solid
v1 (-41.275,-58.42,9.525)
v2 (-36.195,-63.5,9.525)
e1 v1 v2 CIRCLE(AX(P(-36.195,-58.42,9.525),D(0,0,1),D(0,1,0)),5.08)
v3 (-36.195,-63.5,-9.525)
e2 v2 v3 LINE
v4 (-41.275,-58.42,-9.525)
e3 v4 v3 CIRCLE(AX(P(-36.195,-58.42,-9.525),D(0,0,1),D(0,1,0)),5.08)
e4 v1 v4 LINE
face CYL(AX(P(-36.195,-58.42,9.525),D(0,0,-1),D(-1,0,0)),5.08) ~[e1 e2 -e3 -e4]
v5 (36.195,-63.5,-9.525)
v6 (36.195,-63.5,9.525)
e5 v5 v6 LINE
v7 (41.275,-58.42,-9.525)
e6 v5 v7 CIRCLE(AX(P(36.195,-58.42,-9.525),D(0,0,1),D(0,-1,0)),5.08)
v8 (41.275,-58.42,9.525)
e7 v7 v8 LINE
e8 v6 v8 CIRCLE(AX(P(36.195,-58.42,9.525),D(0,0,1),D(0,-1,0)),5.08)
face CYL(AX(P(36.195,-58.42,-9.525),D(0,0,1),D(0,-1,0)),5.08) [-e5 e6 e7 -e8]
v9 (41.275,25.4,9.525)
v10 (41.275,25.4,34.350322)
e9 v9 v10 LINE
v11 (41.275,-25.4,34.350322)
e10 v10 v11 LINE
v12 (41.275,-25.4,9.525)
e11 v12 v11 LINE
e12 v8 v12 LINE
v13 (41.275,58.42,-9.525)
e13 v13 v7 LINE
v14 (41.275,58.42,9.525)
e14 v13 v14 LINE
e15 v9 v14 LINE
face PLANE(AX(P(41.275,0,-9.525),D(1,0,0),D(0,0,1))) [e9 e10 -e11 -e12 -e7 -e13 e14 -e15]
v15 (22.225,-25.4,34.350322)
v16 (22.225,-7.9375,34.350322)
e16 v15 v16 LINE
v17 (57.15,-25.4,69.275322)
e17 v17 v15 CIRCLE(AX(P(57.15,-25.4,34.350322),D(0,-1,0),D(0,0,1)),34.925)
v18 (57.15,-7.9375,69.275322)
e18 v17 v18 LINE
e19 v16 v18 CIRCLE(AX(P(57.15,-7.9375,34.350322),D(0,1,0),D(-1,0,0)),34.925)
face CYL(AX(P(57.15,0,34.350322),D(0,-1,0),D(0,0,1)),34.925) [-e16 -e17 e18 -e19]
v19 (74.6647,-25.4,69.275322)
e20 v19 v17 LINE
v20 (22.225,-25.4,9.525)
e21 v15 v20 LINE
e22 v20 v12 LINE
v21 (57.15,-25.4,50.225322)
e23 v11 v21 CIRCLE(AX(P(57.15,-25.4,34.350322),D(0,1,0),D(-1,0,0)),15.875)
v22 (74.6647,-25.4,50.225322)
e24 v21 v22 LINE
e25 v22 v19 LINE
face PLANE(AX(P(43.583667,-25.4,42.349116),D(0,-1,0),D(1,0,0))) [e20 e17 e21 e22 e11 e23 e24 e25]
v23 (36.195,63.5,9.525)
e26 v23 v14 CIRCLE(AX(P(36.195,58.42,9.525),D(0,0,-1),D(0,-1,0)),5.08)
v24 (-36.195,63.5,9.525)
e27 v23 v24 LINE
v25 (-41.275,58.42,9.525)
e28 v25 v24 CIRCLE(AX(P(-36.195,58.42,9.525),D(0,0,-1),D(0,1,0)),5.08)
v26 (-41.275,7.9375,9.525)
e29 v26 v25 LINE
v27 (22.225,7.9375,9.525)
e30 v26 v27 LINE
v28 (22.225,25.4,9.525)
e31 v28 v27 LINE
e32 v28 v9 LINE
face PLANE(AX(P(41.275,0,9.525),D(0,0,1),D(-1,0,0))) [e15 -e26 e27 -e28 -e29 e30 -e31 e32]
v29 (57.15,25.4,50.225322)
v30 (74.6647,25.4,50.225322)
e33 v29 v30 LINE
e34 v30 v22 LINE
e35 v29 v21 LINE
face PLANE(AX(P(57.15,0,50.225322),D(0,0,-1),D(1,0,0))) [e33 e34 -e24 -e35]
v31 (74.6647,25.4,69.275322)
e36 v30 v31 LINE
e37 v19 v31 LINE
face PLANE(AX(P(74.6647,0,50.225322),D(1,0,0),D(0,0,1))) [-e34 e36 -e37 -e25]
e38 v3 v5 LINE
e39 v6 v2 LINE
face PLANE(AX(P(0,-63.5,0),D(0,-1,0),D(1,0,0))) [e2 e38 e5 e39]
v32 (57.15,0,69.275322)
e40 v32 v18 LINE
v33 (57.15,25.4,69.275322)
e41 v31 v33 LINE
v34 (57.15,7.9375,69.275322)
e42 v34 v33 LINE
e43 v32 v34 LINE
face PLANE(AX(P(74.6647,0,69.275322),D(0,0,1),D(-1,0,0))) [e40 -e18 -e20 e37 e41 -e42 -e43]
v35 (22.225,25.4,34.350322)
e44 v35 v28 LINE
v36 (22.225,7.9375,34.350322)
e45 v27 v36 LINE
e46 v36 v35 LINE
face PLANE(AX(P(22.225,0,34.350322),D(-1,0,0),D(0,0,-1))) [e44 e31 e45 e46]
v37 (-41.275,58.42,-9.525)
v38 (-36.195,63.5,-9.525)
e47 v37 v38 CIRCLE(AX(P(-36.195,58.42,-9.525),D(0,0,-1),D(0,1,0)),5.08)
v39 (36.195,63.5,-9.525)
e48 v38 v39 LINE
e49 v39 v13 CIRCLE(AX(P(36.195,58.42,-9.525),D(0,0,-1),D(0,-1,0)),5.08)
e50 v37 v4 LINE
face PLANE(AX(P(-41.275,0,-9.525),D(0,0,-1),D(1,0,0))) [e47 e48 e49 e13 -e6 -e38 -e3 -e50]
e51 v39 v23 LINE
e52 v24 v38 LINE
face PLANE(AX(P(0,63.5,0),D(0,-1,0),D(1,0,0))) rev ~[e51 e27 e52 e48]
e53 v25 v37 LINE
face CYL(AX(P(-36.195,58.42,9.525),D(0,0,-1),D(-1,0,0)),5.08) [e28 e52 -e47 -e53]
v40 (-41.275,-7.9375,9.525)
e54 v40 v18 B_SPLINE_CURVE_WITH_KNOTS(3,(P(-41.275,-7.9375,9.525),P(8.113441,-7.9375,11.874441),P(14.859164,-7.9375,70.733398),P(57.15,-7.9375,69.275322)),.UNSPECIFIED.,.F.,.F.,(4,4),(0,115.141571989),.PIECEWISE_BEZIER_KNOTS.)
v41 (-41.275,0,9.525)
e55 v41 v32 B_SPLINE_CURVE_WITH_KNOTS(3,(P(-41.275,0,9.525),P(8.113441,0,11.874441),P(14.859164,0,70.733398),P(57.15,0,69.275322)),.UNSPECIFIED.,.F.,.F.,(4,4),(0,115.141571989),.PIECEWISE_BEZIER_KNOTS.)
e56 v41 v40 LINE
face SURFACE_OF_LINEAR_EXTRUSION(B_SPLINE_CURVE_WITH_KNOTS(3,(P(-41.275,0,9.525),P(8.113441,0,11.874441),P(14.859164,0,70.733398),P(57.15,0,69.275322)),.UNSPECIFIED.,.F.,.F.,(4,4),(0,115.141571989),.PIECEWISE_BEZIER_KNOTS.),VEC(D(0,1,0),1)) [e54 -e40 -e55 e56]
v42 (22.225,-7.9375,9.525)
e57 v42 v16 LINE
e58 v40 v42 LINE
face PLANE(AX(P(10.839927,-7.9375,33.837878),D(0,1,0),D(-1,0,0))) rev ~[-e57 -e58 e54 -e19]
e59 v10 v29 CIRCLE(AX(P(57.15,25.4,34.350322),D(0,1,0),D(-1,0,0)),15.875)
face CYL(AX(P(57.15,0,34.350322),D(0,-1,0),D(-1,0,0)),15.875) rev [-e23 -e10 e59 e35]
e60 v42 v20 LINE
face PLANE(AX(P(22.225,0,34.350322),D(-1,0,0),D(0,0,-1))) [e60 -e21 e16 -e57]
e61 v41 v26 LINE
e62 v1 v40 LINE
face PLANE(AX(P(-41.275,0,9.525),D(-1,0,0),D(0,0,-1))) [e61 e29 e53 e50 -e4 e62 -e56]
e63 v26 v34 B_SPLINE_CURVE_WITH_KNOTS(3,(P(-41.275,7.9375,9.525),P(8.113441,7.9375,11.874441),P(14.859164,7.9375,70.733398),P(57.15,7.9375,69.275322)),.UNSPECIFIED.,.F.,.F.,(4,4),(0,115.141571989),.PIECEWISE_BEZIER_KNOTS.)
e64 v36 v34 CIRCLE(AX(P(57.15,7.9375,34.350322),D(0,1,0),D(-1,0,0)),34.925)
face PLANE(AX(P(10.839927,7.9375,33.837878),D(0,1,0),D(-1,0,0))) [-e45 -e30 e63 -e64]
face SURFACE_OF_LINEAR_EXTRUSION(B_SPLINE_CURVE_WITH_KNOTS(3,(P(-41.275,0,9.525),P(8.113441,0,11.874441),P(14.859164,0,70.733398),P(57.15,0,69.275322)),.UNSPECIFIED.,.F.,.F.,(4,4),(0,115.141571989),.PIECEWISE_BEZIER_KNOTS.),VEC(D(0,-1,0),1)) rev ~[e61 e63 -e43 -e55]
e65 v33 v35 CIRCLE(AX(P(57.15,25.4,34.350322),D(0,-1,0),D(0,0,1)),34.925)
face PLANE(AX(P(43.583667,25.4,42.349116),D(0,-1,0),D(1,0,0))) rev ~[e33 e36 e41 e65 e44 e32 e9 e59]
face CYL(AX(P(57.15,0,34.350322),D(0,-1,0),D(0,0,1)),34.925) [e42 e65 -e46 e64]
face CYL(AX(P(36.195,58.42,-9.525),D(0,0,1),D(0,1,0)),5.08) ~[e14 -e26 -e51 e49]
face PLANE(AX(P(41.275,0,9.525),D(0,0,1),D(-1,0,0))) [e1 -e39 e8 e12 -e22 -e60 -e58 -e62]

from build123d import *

# Parameters (mm, degrees)
F1_DEPTH = 63.5
F0_W     = 2.669878304
F0_H     = 19.05
F2_DEPTH = 25.4
F3_DEPTH = 7.9375
F5_R     = 5.08


# Not quite as in the source:
# - a feature of the source that left no trace in its solid (it failed there, or was rolled back) is left out


with BuildPart() as f1:
    # F0 (on Front) → F1 (new body, symmetric)
    with BuildSketch(Plane.XZ):
        Polygon((22.225, 9.525), (-41.275, 9.525), (-41.275, -9.525), (41.275, -9.525), (41.275, 9.525), align=None)
    extrude(amount=F1_DEPTH, both=True)

    # F0 (on Front) → F2 (join, symmetric)
    with BuildSketch(Plane.XZ):
        with BuildLine():
            Line((22.225, 34.3503219656), (22.225, 9.525))
            Line((22.225, 9.525), (41.275, 9.525))
            Line((41.275, 9.525), (41.275, 34.3503219656))
            ThreePointArc((41.275, 34.3503219656), (45.9246798487, 45.5756421169), (57.15, 50.2253219656))
            Line((57.15, 50.2253219656), (71.9948219351, 50.2253219656))
            Line((71.9948219351, 50.2253219656), (71.9948219351, 69.2753219656))
            Line((71.9948219351, 69.2753219656), (57.15, 69.2753219656))
            ThreePointArc((57.15, 69.2753219656), (32.4542956671, 59.0460262985), (22.225, 34.3503219656))
        make_face()
        with Locations((73.3297610871, 59.7503219656)):
            Rectangle(F0_W, F0_H)
    extrude(amount=F2_DEPTH, both=True)

    # F0 (on Front) → F3 (join, symmetric)
    with BuildSketch(Plane.XZ):
        with BuildLine():
            add(Edge.make_bspline(
                [(-41.275, 9.525), (8.1134410575, 11.8744410574), (14.8591641337, 70.7333981991), (57.15, 69.2753219656)],
                knots=[0, 0, 0, 0, 115.1415719885, 115.1415719885, 115.1415719885, 115.1415719885], degree=3))
            Line((-41.275, 9.525), (22.225, 9.525))
            Line((22.225, 9.525), (22.225, 34.3503219656))
            ThreePointArc((22.225, 34.3503219656), (32.4542956671, 59.0460262985), (57.15, 69.2753219656))
        make_face()
    extrude(amount=F3_DEPTH, both=True)

    # F5
    f5_edges = [f1.edges().sort_by_distance(p)[0] for p in [
        (-41.275, -63.5, 0),
        (-41.275, 63.5, 0),
        (41.275, -63.5, 0),
        (41.275, 63.5, 0),
    ]]
    fillet(f5_edges, radius=F5_R)


solid = f1.part
